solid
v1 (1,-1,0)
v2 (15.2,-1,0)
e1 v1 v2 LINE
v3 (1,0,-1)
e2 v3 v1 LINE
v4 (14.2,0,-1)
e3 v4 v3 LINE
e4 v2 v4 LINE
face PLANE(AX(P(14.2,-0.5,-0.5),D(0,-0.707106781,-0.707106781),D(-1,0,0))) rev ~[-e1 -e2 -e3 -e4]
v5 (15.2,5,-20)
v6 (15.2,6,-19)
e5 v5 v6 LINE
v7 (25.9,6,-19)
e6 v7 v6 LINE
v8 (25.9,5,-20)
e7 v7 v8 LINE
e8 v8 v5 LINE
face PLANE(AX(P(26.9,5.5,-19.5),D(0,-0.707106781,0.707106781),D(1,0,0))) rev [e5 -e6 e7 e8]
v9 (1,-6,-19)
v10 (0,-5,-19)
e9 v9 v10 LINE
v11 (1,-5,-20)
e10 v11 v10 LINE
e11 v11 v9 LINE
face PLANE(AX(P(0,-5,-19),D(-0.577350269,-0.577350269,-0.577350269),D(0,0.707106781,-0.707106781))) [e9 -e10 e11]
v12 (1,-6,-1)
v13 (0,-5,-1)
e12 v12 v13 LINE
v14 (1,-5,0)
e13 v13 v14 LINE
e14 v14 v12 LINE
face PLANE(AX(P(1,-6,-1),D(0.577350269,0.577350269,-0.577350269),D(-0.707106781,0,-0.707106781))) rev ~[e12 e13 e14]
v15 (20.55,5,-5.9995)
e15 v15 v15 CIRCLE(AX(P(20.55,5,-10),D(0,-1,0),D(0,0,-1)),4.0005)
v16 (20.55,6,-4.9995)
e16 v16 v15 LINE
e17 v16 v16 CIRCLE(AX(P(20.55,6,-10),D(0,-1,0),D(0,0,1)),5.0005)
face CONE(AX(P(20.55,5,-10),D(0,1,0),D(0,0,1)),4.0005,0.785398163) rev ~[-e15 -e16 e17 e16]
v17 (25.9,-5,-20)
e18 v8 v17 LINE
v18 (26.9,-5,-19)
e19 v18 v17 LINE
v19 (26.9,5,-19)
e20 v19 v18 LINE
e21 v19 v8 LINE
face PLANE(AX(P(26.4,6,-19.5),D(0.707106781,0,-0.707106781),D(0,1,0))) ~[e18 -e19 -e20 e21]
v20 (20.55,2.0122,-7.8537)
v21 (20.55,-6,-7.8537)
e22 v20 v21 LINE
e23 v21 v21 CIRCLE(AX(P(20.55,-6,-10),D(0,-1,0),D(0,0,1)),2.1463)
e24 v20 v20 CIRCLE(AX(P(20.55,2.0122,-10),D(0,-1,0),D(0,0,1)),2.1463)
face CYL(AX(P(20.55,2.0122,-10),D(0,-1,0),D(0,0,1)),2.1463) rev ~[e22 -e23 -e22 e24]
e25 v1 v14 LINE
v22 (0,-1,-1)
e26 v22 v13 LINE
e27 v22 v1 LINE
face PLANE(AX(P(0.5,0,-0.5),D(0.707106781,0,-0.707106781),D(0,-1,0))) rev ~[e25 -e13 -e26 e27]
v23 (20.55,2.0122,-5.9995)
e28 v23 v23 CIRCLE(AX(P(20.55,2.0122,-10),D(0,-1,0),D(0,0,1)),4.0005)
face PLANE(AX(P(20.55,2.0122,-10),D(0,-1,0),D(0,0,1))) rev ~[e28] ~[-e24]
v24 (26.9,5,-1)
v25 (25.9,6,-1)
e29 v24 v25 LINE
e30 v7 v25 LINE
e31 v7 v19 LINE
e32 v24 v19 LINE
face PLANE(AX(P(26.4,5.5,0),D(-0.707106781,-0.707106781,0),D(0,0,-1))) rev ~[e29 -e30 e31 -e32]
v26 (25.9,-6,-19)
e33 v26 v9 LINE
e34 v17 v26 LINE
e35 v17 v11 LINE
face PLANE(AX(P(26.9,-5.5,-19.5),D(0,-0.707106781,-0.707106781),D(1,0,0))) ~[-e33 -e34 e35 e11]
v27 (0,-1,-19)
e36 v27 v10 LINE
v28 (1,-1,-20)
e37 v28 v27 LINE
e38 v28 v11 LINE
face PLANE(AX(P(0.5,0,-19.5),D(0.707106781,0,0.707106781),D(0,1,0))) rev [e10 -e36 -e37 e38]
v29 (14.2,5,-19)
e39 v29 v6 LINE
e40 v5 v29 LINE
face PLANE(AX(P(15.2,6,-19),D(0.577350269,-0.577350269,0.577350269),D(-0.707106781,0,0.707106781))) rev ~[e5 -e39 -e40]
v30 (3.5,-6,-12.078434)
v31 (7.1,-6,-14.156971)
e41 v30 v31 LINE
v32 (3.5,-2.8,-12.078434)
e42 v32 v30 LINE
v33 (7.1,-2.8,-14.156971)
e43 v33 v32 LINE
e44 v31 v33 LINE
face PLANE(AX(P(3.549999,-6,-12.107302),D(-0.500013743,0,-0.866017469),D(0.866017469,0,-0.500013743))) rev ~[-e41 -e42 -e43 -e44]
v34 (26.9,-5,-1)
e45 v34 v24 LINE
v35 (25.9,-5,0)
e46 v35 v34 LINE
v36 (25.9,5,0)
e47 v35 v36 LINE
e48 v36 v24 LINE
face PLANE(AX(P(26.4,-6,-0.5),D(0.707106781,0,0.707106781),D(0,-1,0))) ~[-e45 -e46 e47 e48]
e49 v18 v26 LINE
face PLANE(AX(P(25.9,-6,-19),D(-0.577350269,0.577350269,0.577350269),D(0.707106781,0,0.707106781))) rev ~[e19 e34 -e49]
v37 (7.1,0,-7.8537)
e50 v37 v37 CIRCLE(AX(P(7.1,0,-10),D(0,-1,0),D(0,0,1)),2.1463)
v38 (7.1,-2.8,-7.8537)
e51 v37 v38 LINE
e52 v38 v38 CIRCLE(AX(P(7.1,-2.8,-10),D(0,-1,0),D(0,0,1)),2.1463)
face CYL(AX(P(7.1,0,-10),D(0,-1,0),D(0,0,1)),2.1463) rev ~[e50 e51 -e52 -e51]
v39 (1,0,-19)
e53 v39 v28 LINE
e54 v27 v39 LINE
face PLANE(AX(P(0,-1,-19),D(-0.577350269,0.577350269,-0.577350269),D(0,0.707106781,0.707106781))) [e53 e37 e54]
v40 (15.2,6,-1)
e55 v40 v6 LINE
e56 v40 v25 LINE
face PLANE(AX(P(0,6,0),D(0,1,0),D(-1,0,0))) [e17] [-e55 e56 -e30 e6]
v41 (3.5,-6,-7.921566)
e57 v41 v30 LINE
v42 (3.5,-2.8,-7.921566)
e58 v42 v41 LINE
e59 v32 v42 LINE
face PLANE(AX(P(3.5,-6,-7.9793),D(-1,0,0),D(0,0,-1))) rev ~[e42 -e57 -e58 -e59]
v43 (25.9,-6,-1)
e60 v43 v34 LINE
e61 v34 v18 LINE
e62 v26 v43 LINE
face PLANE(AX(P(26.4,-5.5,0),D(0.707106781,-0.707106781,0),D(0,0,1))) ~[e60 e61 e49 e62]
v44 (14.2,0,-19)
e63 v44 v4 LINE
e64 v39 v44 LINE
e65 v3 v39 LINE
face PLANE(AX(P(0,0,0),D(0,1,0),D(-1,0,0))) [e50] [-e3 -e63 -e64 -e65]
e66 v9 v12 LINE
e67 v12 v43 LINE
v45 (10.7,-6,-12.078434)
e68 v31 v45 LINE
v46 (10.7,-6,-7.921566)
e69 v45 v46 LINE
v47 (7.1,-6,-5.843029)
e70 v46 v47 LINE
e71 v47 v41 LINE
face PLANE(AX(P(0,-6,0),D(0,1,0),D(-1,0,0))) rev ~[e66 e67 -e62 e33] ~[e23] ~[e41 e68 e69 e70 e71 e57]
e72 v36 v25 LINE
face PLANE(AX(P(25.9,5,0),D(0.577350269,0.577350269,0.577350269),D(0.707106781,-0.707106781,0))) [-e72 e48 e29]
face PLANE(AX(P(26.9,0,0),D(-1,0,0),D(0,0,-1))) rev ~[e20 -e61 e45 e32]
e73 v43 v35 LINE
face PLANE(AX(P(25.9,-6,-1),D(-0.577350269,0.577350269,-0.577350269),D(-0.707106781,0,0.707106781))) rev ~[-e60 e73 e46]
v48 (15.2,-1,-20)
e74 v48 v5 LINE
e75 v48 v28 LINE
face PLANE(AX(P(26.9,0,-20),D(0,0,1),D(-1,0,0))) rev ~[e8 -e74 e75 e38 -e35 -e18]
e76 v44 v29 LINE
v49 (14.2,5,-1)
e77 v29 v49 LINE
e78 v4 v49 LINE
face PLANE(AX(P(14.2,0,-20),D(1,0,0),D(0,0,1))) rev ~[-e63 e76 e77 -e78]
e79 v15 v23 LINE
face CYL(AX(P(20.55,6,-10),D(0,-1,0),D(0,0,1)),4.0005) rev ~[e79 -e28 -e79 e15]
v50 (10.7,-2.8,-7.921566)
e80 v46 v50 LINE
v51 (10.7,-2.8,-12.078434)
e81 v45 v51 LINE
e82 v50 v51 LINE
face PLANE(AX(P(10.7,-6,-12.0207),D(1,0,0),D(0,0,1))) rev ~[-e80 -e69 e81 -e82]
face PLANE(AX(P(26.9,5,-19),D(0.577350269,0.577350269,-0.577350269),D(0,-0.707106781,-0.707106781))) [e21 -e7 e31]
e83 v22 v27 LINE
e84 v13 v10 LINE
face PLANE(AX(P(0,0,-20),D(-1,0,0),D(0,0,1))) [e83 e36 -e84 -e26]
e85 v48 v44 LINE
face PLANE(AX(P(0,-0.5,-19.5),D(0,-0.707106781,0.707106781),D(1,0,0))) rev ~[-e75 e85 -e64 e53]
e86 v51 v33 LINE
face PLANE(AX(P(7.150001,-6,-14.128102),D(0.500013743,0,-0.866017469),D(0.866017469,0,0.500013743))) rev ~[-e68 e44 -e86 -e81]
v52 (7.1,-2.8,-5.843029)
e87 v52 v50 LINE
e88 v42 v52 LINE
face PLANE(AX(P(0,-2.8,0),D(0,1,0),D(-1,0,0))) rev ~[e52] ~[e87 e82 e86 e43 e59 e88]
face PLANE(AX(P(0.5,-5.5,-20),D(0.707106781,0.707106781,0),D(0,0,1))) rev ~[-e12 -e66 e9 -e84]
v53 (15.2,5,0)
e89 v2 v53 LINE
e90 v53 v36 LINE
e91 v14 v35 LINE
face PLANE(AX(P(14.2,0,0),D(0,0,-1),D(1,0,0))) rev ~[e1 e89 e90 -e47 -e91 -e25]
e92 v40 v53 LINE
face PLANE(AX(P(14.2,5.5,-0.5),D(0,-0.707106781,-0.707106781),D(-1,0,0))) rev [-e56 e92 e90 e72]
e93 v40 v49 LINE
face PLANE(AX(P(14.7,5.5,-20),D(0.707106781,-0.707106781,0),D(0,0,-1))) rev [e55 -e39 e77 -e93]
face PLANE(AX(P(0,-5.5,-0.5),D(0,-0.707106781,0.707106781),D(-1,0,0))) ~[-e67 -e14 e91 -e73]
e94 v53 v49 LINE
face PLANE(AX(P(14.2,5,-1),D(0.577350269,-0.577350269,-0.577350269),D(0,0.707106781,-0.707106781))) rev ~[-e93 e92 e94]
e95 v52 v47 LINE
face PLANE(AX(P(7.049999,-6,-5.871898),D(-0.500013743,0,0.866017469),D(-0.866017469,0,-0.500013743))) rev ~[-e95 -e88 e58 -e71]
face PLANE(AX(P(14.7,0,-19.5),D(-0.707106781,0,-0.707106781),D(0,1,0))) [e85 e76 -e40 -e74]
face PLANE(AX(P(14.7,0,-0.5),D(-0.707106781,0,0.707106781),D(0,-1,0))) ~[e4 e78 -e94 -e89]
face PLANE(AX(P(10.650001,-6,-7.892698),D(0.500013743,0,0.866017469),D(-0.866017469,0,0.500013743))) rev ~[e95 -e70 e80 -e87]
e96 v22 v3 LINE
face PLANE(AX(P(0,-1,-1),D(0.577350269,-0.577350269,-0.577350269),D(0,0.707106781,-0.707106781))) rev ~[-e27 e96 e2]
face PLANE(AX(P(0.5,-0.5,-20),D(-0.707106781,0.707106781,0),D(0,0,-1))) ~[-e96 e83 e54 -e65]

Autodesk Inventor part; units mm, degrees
ref_plane "YZ Plane" through (0, 0, 0) normal (1, 0, 0) x (0, 1, 0)
ref_plane "XZ Plane" through (0, 0, 0) normal (0, 1, 0) x (-1, 0, 0)
ref_plane "XY Plane" through (0, 0, 0) normal (0, 0, 1) x (1, 0, 0)
sketch "Base Sketch" plane through (0, 0, 0) normal (0, 1, 0) x (-1, 0, 0)
  line L0 (0, 0) -> (-26.9, 0)
  line L1 (-26.9, 0) -> (-26.9, -20)
  line L2 (-26.9, -20) -> (0, -20)
  line L3 (0, -20) -> (0, 0)
  line L4 (-14.2, -20) -> (-14.2, 0)
  line L5 (-10.6, -7.9793) -> (-7.1, -5.9585)
  line L6 (-7.1, -5.9585) -> (-3.6, -7.9793)
  line L7 (-3.6, -7.9793) -> (-3.6, -12.0207)
  line L8 (-3.6, -12.0207) -> (-7.1, -14.0415)
  line L9 (-7.1, -14.0415) -> (-10.6, -12.0207)
  line L10 (-10.6, -12.0207) -> (-10.6, -7.9793)
  point P0 (-20.55, -10)
  point P1 (-26.9, -10)
  point P2 (-7.1, -10)
  point P3 (0, -10)
  point P4 (-7.1, -10)
  dimension "d0" = 20
  dimension "d5" = 14.2
  dimension "d7" = 6.35
  dimension "d8" = 6.35
  dimension "d25" = 7.1
  dimension "d36" = 7
extrude "BasePlate" add sketch "Base Sketch" against normal blind 6 contours L3 L2 L4 L0 | L4 L2 L1 L0 | L5 L6 L7 L8 L9 L10
hole "Load Screw Hole" at (7.1, 0, -10) direction (0, -1, 0) diameter 4.2926 end through all clearance for "Socket Head Cap Screw" size "M4" standard "Ansi Metric M Profile"
extrude "Top Section" add sketch "Base Sketch" along normal blind 6 contours L4 L2 L1 L0
sketch "Sketch2" plane through (0, 6, 0) normal (0, 1, 0) x (1, 0, 0)
  point P0 (20.55, 10)
hole "Extrusion Mount Screw" at (20.55, 6, -10) direction (0, -1, 0) diameter 4.2926 end through all counterbore diameter 8.001 counterbore depth 3.9878 clearance for "Socket Head Cap Screw" size "M4" standard "Ansi Metric M Profile"
chamfer "Chamfer" distance 1 angle 45 18 edges at (7.1, 0, -20) (14.2, 3, -20) (20.55, 6, -20) (26.9, 6, -10) (20.55, 6, 0) (14.2, 3, 0) (7.1, 0, 0) (0, -3, 0) (26.9, 0, 0) (26.9, 0, -20) (13.45, -6, -20) (26.9, -6, -10) (13.45, -6, 0) (0, -6, -10) (0, -3, -20) (0, 0, -10) (14.2, 6, -10) (20.55, 6, -14.0005)
extrude "Hex Nut Slot" cut sketch "Base Sketch" along normal blind 3.2 from surface at -6 contours L5 L6 L7 L8 L9 L10
thicken "Nut Fit Clearance" operation cut thickness 0.1 both sides no extend neighbours yes toward (-0.5, 0, 0.8660254) faces at (4.7667, -4.9333, -7.3057) (3.6, -4.9333, -10.6736) (5.9333, -4.9333, -13.3679) (9.4333, -4.9333, -12.6943) (10.6, -4.9333, -9.3264) (8.2667, -4.9333, -6.6321)
equation "\"d8\" = d7"
equation "\"d25\" = 0.5 * d5"
equation "\"d9\" = baseThickness"
equation "\"d22\" = chamferSize"
equation "\"baseThickness\" = 6"
equation "\"jawTravel\" = 3"
equation "\"M4_clearance_hole\" = 4.2"
equation "\"slotLength\" = M4_clearance_hole + jawTravel"
equation "\"chamferSize\" = 1"
properties material "ABS Plastic"
